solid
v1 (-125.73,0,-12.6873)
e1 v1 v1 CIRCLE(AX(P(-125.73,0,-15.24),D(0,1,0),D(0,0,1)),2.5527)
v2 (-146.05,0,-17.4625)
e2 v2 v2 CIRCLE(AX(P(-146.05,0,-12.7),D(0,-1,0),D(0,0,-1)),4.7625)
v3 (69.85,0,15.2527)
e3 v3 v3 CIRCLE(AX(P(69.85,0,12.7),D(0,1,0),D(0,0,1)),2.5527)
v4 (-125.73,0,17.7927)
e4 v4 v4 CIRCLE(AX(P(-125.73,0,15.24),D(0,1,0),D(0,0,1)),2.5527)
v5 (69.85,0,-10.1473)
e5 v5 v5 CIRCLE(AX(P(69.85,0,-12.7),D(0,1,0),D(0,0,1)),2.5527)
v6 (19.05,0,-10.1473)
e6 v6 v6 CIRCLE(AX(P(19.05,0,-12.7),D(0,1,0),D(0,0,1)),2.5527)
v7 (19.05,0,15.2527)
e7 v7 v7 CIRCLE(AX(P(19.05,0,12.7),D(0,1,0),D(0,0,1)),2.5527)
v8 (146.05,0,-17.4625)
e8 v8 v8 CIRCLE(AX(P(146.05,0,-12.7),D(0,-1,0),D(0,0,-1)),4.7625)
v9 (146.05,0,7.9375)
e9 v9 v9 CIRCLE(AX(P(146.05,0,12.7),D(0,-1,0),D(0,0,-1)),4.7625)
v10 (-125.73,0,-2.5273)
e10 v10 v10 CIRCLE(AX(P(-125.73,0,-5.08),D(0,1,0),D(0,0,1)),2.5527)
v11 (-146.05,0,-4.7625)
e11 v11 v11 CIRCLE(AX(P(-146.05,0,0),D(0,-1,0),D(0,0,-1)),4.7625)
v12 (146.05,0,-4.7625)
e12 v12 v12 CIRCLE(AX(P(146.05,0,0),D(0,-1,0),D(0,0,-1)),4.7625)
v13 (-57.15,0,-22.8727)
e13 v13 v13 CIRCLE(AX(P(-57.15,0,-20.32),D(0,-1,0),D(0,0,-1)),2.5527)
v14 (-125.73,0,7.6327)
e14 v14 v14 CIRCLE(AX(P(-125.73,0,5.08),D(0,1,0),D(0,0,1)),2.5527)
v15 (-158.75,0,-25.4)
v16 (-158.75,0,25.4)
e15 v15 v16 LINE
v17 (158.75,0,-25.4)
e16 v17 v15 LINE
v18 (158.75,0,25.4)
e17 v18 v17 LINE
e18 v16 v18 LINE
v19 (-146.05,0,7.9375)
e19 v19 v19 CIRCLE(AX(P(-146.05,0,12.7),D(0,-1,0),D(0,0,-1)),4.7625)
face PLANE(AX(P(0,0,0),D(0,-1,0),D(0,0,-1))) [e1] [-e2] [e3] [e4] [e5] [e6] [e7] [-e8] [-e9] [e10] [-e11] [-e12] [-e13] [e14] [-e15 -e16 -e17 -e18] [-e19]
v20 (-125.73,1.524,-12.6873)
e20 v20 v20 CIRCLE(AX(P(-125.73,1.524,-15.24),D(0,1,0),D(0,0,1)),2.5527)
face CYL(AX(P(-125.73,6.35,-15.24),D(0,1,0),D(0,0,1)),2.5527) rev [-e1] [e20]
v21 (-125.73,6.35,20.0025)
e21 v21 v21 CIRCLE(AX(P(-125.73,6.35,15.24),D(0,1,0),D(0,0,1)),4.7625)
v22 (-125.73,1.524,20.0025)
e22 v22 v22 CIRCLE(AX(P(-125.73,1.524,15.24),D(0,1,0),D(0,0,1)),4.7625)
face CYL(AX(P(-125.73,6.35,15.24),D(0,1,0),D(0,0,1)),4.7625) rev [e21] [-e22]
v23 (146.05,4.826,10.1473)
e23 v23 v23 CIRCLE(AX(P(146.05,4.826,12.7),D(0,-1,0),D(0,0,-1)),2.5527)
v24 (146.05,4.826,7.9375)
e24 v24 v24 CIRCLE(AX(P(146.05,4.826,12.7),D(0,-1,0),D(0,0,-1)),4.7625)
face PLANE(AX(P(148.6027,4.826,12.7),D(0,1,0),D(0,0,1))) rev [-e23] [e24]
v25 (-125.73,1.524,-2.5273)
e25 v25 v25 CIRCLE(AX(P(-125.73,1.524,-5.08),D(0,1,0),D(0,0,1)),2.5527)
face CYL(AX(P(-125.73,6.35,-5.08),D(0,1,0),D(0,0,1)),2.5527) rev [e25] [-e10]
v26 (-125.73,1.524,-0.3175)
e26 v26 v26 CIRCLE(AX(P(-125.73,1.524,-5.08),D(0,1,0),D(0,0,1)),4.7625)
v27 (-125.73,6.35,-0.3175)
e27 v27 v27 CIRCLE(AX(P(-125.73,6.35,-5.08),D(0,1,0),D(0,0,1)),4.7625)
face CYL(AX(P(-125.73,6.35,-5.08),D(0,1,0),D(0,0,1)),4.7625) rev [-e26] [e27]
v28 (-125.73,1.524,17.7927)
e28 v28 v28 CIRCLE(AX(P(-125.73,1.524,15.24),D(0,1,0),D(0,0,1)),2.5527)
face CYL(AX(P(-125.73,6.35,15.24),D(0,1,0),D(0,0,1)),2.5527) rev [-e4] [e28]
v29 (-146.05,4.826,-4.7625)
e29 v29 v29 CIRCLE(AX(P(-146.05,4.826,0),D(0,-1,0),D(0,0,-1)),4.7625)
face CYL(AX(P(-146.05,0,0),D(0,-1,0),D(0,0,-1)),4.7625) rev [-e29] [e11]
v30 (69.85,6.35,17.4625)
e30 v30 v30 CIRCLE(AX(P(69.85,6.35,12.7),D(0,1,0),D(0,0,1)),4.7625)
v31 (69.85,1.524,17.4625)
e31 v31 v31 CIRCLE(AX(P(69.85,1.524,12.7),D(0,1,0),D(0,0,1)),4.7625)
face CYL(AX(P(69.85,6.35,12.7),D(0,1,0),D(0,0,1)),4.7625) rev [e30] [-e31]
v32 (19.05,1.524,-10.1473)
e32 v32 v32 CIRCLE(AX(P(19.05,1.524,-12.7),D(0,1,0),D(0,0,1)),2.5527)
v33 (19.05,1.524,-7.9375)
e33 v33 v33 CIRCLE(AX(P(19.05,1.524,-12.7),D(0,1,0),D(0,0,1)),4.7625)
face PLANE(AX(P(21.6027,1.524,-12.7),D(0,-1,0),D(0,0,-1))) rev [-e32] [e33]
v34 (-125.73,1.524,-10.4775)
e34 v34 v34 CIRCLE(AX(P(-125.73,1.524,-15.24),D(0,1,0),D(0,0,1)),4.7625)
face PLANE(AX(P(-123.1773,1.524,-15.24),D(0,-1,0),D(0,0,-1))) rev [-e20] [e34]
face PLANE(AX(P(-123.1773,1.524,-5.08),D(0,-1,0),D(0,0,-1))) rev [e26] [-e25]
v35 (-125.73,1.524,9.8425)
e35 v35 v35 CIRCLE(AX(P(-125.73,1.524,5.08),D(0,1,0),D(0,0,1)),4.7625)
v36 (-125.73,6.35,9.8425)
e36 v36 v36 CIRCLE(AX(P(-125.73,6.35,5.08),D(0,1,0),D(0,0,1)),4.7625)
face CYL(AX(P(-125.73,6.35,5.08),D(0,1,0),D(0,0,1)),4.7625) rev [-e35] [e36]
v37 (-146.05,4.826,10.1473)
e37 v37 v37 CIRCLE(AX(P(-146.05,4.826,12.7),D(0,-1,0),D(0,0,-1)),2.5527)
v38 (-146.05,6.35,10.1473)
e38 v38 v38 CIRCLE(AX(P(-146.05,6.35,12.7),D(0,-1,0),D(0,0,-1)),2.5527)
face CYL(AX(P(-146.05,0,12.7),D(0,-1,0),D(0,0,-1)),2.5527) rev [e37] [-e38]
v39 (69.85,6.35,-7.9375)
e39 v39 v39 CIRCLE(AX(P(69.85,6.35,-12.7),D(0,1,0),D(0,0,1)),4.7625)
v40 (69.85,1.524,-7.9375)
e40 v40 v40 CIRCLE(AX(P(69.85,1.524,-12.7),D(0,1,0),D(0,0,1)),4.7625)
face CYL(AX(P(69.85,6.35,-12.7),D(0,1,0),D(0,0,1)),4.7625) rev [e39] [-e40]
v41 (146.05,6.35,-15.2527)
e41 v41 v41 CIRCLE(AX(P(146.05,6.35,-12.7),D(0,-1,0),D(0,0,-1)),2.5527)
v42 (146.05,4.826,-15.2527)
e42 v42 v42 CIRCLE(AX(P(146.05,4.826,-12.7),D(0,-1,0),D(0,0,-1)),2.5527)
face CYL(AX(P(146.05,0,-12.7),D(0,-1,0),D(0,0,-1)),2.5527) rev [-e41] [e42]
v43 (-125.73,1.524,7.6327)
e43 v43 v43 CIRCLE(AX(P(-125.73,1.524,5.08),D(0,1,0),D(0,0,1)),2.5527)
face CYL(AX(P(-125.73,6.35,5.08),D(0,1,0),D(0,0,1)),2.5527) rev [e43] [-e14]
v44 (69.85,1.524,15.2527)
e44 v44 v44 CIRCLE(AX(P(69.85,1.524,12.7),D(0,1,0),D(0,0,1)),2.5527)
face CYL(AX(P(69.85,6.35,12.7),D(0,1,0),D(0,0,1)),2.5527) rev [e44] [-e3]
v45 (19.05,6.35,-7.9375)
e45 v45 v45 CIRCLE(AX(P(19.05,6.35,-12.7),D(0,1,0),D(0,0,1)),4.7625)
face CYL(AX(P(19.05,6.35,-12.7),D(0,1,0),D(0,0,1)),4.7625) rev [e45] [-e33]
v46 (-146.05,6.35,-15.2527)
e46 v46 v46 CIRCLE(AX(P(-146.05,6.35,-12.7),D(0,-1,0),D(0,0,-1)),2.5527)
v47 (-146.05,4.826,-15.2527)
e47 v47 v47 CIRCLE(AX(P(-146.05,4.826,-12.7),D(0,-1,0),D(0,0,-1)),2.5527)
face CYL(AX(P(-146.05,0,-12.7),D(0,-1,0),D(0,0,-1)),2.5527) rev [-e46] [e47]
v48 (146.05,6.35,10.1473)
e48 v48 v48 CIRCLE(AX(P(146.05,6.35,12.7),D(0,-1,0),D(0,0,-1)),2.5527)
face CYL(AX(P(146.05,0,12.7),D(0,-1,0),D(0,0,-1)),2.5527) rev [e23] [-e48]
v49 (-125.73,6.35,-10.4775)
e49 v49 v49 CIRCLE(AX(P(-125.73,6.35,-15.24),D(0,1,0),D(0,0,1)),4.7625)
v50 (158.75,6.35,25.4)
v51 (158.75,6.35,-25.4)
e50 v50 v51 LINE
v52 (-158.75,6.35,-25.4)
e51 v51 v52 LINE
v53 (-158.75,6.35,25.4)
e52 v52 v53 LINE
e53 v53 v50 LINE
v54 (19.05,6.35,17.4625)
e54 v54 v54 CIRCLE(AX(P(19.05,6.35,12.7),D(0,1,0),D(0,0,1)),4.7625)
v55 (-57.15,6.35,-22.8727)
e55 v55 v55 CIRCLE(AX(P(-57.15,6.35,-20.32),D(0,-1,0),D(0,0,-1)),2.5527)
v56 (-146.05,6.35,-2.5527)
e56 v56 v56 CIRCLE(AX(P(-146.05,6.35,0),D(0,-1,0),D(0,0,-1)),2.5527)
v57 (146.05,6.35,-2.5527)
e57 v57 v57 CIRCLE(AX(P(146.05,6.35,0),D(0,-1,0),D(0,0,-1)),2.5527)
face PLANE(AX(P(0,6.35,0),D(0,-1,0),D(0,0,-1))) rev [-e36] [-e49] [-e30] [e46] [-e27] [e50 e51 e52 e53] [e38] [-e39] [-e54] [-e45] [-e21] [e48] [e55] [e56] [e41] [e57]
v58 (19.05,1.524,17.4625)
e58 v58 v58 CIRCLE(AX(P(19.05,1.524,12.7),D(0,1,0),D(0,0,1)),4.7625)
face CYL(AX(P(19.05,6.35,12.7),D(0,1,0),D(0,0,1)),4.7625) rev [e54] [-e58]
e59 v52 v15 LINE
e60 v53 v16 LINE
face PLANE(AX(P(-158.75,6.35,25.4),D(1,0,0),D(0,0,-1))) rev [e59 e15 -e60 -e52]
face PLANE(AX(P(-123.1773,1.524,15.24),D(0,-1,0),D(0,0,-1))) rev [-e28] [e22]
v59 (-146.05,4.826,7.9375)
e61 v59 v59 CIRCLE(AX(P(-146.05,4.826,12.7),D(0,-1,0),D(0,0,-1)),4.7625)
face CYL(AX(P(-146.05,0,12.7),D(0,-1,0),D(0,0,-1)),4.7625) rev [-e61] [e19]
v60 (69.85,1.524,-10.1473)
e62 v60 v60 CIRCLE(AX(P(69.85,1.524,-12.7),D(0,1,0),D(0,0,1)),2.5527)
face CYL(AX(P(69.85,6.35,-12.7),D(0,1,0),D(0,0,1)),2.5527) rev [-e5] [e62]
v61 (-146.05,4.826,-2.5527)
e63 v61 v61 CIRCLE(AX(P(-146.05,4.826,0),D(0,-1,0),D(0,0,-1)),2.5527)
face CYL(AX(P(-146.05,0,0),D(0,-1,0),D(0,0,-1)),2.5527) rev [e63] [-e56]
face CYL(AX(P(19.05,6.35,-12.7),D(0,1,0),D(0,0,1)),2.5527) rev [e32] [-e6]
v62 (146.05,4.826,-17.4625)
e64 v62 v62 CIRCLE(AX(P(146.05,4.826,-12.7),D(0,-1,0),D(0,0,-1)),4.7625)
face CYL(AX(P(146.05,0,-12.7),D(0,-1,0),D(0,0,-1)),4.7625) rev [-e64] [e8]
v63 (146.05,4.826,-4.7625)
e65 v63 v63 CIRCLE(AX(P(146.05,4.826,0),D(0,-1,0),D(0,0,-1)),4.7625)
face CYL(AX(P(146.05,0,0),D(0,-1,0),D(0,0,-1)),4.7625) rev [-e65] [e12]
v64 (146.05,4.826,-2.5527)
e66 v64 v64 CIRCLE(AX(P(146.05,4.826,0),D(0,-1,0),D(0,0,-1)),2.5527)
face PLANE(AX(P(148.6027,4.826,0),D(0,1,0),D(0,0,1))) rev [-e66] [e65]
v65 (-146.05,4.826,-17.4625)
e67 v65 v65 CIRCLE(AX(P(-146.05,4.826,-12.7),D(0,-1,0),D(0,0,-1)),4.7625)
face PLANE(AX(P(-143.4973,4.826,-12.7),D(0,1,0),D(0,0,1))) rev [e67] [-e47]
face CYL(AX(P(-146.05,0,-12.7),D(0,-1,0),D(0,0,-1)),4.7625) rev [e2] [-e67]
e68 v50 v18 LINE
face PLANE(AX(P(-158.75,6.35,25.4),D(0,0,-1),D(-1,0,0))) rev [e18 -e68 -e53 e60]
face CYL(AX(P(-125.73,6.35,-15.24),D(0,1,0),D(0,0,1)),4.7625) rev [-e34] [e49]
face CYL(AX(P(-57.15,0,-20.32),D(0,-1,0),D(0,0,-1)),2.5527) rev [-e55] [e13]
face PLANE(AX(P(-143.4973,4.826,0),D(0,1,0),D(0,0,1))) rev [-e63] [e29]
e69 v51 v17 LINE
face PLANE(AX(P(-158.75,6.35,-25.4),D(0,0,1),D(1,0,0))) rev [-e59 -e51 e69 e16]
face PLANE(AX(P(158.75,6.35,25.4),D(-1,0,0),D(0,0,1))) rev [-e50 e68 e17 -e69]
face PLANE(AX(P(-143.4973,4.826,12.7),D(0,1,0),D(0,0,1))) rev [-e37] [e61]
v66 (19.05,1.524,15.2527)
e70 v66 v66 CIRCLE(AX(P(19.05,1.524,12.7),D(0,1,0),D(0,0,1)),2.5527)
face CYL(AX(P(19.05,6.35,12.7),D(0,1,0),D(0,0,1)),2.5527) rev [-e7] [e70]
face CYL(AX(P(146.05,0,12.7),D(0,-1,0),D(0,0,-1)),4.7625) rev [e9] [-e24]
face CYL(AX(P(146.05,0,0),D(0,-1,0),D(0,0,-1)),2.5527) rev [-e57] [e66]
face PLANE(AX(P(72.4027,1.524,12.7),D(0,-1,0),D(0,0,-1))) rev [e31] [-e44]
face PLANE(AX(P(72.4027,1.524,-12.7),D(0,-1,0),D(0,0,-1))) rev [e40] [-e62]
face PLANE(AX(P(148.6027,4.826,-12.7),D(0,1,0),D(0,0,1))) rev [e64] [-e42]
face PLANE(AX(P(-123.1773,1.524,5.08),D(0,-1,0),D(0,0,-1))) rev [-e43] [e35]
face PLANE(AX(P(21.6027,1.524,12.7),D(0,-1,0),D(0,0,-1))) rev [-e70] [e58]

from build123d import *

# Parameters (mm, degrees)
SKETCH1_W                                       = 317.5
SKETCH1_H                                       = 50.8
BOSS_EXTRUDE1_DEPTH                             = 6.35
CBORE_FOR_10_SOCKET_HEAD_CAP_SCREW1_D           = 5.1054
CBORE_FOR_10_SOCKET_HEAD_CAP_SCREW1_CBORE_D     = 9.525
CBORE_FOR_10_SOCKET_HEAD_CAP_SCREW1_CBORE_DEPTH = 4.826
CBORE_FOR_10_SOCKET_HEAD_CAP_SCREW2_D           = 5.1054
CBORE_FOR_10_SOCKET_HEAD_CAP_SCREW2_CBORE_D     = 9.525
CBORE_FOR_10_SOCKET_HEAD_CAP_SCREW2_CBORE_DEPTH = 4.826
F_1_4_20_TAPPED_HOLE1_OUTLINE_R                 = 2.5527
F_1_4_20_TAPPED_HOLE1_DEPTH                     = 6.35


# Read off the part's stored shape, not the designer's step: 1/4-20 Tapped Hole1
with BuildPart() as part:
    # Sketch1 → Boss-Extrude1 (new body)
    with BuildSketch(Plane(origin=(0, 0, 0), x_dir=(1, 0, 0), z_dir=(0, 1, 0))):
        Rectangle(SKETCH1_W, SKETCH1_H)
    extrude(amount=BOSS_EXTRUDE1_DEPTH)

    # CBORE for #10 Socket Head Cap Screw1 (through all)
    with Locations(Plane(origin=(0, 6.35, 0), x_dir=(1, 0, 0), z_dir=(0, 1, 0))):
        with Locations((-125.73, -5.08), (19.05, 12.7), (69.85, 12.7), (19.05, -12.7), (69.85, -12.7), (-125.73, 15.24), (-125.73, 5.08), (-125.73, -15.24)):
            CounterBoreHole(CBORE_FOR_10_SOCKET_HEAD_CAP_SCREW1_D / 2, CBORE_FOR_10_SOCKET_HEAD_CAP_SCREW1_CBORE_D / 2, CBORE_FOR_10_SOCKET_HEAD_CAP_SCREW1_CBORE_DEPTH)

    # CBORE for #10 Socket Head Cap Screw2 (through all)
    with Locations(Plane.XZ):
        with Locations((-146.05, 12.7), (-146.05, 0), (-146.05, -12.7), (146.05, 12.7), (146.05, 0), (146.05, -12.7)):
            CounterBoreHole(CBORE_FOR_10_SOCKET_HEAD_CAP_SCREW2_D / 2, CBORE_FOR_10_SOCKET_HEAD_CAP_SCREW2_CBORE_D / 2, CBORE_FOR_10_SOCKET_HEAD_CAP_SCREW2_CBORE_DEPTH)

    # 1/4-20 Tapped Hole1 outline → 1/4-20 Tapped Hole1 (cut)
    with BuildSketch(Plane(origin=(0, 0, 0), x_dir=(1, 0, 0), z_dir=(0, 1, 0))):
        with Locations((-57.15, 20.32)):
            Circle(F_1_4_20_TAPPED_HOLE1_OUTLINE_R)
    extrude(amount=F_1_4_20_TAPPED_HOLE1_DEPTH, mode=Mode.SUBTRACT)


solid = part.part
